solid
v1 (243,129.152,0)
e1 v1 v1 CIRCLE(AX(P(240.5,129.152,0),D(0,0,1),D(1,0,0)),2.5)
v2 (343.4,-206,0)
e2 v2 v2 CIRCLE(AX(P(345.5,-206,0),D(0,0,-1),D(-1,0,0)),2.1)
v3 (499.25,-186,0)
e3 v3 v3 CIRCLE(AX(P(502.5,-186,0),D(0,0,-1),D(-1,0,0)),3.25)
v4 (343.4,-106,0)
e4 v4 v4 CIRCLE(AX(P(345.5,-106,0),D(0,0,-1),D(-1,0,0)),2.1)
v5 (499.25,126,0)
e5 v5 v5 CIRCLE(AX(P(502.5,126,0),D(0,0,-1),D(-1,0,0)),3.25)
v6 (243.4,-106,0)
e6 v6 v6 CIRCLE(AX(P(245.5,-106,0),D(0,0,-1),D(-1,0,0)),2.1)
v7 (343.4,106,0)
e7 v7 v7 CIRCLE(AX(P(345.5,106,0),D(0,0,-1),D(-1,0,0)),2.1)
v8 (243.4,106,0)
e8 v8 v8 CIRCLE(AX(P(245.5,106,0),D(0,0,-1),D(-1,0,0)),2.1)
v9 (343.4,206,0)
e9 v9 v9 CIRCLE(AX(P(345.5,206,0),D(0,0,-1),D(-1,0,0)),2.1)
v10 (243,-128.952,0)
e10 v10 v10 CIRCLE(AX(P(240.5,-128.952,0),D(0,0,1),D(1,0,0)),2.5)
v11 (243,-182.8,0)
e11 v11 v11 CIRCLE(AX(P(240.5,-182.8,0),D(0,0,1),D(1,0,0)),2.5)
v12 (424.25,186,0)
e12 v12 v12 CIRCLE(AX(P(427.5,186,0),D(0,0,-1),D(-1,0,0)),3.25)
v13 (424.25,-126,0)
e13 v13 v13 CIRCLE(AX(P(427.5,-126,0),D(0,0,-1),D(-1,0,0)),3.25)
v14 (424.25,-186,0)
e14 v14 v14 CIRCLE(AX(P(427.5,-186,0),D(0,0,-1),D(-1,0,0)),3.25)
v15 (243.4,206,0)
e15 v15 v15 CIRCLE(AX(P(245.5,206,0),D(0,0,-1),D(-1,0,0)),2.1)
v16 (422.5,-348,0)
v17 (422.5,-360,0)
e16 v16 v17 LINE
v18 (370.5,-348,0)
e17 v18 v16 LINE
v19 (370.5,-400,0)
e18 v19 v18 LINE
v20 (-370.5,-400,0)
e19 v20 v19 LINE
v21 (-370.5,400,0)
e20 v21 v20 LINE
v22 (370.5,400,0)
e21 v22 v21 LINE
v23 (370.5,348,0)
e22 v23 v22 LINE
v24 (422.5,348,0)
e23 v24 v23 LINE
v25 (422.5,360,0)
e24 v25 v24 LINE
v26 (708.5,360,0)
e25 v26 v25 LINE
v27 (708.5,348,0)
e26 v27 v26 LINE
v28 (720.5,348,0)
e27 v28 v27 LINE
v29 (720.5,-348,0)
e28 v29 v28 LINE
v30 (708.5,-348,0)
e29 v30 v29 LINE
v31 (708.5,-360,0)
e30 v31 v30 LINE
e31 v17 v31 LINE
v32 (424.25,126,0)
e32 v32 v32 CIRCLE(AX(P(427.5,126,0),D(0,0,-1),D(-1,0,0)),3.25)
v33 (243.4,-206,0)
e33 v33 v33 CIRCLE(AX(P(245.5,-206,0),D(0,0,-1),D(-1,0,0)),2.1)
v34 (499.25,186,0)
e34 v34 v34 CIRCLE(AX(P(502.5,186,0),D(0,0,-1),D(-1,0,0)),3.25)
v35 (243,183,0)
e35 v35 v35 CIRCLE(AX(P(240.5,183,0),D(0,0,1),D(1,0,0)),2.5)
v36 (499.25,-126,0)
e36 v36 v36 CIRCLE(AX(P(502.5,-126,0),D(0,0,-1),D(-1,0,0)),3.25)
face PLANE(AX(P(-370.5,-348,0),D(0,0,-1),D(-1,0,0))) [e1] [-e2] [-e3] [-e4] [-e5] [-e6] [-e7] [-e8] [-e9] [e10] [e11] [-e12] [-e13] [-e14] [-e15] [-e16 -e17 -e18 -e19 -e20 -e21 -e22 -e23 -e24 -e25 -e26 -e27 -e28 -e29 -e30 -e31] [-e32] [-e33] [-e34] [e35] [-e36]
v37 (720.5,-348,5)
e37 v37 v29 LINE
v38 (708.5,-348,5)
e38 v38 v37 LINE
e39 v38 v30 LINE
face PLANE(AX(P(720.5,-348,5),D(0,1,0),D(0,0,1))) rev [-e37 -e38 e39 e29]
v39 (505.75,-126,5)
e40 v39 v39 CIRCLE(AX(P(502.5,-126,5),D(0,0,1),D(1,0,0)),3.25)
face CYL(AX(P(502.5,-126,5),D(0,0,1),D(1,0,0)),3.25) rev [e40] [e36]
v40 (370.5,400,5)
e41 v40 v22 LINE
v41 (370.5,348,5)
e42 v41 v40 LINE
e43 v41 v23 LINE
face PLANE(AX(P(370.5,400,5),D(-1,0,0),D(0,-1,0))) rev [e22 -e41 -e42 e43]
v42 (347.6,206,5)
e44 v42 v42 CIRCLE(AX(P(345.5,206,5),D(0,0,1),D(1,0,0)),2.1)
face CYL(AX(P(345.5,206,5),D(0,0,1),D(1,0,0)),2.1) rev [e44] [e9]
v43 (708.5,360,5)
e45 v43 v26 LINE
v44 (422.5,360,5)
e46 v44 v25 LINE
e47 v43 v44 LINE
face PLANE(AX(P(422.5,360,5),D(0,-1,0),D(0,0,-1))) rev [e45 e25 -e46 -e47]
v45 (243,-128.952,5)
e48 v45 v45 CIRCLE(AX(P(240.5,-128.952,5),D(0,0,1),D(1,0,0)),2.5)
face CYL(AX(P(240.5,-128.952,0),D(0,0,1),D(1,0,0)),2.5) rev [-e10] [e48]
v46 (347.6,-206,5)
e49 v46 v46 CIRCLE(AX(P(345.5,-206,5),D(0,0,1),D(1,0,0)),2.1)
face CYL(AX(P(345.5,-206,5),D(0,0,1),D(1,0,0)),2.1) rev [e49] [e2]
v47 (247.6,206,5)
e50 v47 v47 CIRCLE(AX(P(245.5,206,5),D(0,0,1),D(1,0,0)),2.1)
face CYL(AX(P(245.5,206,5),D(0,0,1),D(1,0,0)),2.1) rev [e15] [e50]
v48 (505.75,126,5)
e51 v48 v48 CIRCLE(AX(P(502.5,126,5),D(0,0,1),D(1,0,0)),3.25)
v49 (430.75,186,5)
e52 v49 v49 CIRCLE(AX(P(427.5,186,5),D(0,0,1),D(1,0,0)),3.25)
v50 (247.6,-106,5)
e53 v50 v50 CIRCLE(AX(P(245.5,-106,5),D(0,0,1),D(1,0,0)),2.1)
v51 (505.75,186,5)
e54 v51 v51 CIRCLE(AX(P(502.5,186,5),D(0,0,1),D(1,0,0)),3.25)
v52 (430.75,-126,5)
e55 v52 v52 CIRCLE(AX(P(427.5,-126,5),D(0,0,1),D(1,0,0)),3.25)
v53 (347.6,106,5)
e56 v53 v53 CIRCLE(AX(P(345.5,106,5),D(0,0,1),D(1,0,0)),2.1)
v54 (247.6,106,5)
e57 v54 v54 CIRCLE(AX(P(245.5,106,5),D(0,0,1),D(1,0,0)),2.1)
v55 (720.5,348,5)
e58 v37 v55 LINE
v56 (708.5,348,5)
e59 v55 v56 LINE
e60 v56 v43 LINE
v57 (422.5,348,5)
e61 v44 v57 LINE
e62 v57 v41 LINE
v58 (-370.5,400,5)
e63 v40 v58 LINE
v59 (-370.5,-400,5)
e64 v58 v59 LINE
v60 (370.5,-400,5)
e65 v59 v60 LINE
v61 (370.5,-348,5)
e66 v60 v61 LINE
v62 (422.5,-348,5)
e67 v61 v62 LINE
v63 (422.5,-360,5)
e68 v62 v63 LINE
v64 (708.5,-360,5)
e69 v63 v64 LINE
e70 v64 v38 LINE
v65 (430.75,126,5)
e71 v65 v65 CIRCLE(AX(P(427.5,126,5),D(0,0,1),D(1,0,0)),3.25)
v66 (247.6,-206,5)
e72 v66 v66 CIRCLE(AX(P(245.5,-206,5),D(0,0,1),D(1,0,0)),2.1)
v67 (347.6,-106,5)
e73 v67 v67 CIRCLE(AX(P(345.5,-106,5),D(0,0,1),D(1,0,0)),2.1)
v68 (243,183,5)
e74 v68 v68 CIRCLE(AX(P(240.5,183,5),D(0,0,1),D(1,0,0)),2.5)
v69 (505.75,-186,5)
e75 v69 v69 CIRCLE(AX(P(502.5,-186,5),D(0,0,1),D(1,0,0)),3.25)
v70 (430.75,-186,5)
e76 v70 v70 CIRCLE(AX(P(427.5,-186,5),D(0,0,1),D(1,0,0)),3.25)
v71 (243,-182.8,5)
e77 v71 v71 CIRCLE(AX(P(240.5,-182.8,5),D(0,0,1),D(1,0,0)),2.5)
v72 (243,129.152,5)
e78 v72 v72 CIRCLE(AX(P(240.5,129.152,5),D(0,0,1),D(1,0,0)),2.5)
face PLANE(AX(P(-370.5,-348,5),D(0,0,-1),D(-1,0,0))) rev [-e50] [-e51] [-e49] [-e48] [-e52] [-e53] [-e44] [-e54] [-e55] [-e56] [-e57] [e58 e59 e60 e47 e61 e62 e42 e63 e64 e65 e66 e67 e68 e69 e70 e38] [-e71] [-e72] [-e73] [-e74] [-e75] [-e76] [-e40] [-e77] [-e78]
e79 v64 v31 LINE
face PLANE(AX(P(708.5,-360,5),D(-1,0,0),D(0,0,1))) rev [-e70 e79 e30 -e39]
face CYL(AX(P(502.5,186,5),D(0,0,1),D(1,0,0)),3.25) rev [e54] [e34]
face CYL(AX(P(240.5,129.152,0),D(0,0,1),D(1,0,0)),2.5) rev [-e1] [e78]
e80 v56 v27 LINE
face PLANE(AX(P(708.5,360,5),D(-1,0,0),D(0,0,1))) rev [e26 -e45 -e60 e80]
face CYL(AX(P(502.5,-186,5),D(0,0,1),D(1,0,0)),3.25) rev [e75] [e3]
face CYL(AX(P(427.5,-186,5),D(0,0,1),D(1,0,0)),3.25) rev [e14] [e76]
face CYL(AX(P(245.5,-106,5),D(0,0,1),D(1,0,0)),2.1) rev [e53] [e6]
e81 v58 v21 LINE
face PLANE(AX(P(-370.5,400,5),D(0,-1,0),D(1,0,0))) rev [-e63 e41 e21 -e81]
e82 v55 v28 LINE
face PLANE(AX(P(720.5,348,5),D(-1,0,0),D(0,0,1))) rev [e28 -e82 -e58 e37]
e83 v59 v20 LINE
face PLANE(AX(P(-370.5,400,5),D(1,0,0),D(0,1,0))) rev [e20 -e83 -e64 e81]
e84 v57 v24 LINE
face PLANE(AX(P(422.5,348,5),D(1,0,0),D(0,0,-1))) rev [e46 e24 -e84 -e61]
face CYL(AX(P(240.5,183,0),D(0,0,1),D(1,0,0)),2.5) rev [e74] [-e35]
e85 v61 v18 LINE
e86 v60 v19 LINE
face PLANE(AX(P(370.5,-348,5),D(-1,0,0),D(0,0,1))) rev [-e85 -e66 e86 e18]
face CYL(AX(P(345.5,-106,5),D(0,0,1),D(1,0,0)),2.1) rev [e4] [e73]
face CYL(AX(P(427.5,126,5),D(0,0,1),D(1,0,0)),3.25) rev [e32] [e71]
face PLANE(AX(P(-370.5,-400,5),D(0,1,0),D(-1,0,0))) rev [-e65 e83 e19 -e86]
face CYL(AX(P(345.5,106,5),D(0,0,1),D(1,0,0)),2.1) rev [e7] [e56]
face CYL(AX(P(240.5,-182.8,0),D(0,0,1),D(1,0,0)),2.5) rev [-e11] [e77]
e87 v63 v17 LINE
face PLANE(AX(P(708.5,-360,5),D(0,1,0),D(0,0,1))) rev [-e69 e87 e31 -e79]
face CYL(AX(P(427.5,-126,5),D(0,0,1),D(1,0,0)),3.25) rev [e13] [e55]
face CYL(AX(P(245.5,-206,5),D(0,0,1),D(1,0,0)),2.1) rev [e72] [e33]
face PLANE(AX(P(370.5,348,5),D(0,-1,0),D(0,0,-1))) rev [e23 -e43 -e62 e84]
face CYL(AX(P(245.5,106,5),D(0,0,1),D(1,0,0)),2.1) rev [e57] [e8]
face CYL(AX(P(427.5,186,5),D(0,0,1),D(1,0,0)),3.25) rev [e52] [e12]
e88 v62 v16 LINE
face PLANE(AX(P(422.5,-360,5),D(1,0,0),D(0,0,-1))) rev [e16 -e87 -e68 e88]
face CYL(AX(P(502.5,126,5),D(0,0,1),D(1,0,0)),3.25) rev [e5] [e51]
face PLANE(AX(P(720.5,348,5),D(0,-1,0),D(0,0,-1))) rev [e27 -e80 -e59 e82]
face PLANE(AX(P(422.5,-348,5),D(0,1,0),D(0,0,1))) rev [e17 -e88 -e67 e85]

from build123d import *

# Parameters (mm, degrees)
LINEAR_AUSTRAGEN1_DEPTH         = 5
M5X0_8_GEWINDEKERNLOCH1_D       = 4.2
M5X0_8_GEWINDEKERNLOCH1_DEPTH   = 14
M5X0_8_GEWINDEKERNLOCH1_TIP     = 1.2618073
SKIZZE5_R                       = 2.5
SCHNITT_LINEAR_AUSTRAGEN1_DEPTH = 825.102693843
LINEARES_MUSTER1_COUNT          = 2
LINEARES_MUSTER1_PITCH          = 60
LINEARES_MUSTER1_COUNT_DIR2     = 2
LINEARES_MUSTER1_PITCH_DIR2     = 75


with BuildPart() as part:
    # Skizze1 → Linear austragen1 (new body)
    with BuildSketch(Plane.XY):
        Polygon((-370.5, 400), (370.5, 400), (370.5, 348), (422.5, 348), (422.5, 360), (708.5, 360), (708.5, 348), (720.5, 348), (720.5, -348), (708.5, -348), (708.5, -360), (422.5, -360), (422.5, -348), (370.5, -348), (370.5, -400), (-370.5, -400), align=None)
    extrude(amount=LINEAR_AUSTRAGEN1_DEPTH)

    # M5x0.8 Gewindekernloch1
    with Locations(Plane(origin=(345.5, 206, 5), x_dir=(1, 0, 0), z_dir=(0, 0, 1))):
        with Locations((0, 0), (-100, 0), (-100, -100), (0, -100), (0, -312), (-100, -312), (0, -412), (-100, -412)):
            Hole(M5X0_8_GEWINDEKERNLOCH1_D / 2, depth=M5X0_8_GEWINDEKERNLOCH1_DEPTH)
            with Locations((0, 0, -(M5X0_8_GEWINDEKERNLOCH1_DEPTH + M5X0_8_GEWINDEKERNLOCH1_TIP / 2))):  # 118° drill point
                Cone(0, M5X0_8_GEWINDEKERNLOCH1_D / 2, M5X0_8_GEWINDEKERNLOCH1_TIP, mode=Mode.SUBTRACT)

    # Skizze5 → Schnitt-Linear austragen1 (cut, through all)
    with BuildSketch(Plane.XY.offset(5)):
        with Locations((240.5, 183)):
            Circle(SKIZZE5_R)
        with Locations((240.5, 129.152)):
            Circle(SKIZZE5_R)
        with Locations((240.5, -128.952)):
            Circle(SKIZZE5_R)
        with Locations((240.5, -182.8)):
            Circle(SKIZZE5_R)
    extrude(amount=-SCHNITT_LINEAR_AUSTRAGEN1_DEPTH, mode=Mode.SUBTRACT)

    # Skizze8 → Ø6.5 (6.5) Durchmesser Bohrung1 (revolve, cut)
    with BuildSketch(Plane(origin=(427.5, 186, 5), x_dir=(0, -1, 0), z_dir=(1, 0, 0))):
        Polygon((0, 0), (0, 21.952797012), (3.25, 20), (3.25, 0), align=None)
    f_6_5_6_5_durchmesser_bohrung1 = revolve(axis=Axis((427.5, 186, 11.35), (0, 0, -1)), mode=Mode.SUBTRACT)

    # Lineares Muster1: 6.5 _6.5_ Durchmesser Bohrung1 2 × 2
    with Locations(*[(j * LINEARES_MUSTER1_PITCH_DIR2, -i * LINEARES_MUSTER1_PITCH, 0) for i in range(LINEARES_MUSTER1_COUNT) for j in range(LINEARES_MUSTER1_COUNT_DIR2) if (i, j) != (0, 0)]):
        add(f_6_5_6_5_durchmesser_bohrung1, mode=Mode.SUBTRACT)

    # Spiegeln1: Ø6.5 (6.5) Durchmesser Bohrung1 across plane
    add(f_6_5_6_5_durchmesser_bohrung1.mirror(Plane.ZX), mode=Mode.SUBTRACT)

    # Spiegeln1 copy 1 sketch → Spiegeln1 copy 1 (revolve, cut)
    with BuildSketch(Plane(origin=(502.5, -186, 5), x_dir=(0, 1, 0), z_dir=(1, 0, 0))):
        Polygon((0, 0), (0, -21.952797012), (3.25, -20), (3.25, 0), align=None)
    revolve(axis=Axis((502.5, -186, 11.35), (0, 0, 1)), mode=Mode.SUBTRACT)

    # Spiegeln1 copy 2 sketch → Spiegeln1 copy 2 (revolve, cut)
    with BuildSketch(Plane(origin=(427.5, -126, 5), x_dir=(0, 1, 0), z_dir=(1, 0, 0))):
        Polygon((0, 0), (0, -21.952797012), (3.25, -20), (3.25, 0), align=None)
    revolve(axis=Axis((427.5, -126, 11.35), (0, 0, 1)), mode=Mode.SUBTRACT)

    # Spiegeln1 copy 3 sketch → Spiegeln1 copy 3 (revolve, cut)
    with BuildSketch(Plane(origin=(502.5, -126, 5), x_dir=(0, 1, 0), z_dir=(1, 0, 0))):
        Polygon((0, 0), (0, -21.952797012), (3.25, -20), (3.25, 0), align=None)
    revolve(axis=Axis((502.5, -126, 11.35), (0, 0, 1)), mode=Mode.SUBTRACT)


solid = part.part
